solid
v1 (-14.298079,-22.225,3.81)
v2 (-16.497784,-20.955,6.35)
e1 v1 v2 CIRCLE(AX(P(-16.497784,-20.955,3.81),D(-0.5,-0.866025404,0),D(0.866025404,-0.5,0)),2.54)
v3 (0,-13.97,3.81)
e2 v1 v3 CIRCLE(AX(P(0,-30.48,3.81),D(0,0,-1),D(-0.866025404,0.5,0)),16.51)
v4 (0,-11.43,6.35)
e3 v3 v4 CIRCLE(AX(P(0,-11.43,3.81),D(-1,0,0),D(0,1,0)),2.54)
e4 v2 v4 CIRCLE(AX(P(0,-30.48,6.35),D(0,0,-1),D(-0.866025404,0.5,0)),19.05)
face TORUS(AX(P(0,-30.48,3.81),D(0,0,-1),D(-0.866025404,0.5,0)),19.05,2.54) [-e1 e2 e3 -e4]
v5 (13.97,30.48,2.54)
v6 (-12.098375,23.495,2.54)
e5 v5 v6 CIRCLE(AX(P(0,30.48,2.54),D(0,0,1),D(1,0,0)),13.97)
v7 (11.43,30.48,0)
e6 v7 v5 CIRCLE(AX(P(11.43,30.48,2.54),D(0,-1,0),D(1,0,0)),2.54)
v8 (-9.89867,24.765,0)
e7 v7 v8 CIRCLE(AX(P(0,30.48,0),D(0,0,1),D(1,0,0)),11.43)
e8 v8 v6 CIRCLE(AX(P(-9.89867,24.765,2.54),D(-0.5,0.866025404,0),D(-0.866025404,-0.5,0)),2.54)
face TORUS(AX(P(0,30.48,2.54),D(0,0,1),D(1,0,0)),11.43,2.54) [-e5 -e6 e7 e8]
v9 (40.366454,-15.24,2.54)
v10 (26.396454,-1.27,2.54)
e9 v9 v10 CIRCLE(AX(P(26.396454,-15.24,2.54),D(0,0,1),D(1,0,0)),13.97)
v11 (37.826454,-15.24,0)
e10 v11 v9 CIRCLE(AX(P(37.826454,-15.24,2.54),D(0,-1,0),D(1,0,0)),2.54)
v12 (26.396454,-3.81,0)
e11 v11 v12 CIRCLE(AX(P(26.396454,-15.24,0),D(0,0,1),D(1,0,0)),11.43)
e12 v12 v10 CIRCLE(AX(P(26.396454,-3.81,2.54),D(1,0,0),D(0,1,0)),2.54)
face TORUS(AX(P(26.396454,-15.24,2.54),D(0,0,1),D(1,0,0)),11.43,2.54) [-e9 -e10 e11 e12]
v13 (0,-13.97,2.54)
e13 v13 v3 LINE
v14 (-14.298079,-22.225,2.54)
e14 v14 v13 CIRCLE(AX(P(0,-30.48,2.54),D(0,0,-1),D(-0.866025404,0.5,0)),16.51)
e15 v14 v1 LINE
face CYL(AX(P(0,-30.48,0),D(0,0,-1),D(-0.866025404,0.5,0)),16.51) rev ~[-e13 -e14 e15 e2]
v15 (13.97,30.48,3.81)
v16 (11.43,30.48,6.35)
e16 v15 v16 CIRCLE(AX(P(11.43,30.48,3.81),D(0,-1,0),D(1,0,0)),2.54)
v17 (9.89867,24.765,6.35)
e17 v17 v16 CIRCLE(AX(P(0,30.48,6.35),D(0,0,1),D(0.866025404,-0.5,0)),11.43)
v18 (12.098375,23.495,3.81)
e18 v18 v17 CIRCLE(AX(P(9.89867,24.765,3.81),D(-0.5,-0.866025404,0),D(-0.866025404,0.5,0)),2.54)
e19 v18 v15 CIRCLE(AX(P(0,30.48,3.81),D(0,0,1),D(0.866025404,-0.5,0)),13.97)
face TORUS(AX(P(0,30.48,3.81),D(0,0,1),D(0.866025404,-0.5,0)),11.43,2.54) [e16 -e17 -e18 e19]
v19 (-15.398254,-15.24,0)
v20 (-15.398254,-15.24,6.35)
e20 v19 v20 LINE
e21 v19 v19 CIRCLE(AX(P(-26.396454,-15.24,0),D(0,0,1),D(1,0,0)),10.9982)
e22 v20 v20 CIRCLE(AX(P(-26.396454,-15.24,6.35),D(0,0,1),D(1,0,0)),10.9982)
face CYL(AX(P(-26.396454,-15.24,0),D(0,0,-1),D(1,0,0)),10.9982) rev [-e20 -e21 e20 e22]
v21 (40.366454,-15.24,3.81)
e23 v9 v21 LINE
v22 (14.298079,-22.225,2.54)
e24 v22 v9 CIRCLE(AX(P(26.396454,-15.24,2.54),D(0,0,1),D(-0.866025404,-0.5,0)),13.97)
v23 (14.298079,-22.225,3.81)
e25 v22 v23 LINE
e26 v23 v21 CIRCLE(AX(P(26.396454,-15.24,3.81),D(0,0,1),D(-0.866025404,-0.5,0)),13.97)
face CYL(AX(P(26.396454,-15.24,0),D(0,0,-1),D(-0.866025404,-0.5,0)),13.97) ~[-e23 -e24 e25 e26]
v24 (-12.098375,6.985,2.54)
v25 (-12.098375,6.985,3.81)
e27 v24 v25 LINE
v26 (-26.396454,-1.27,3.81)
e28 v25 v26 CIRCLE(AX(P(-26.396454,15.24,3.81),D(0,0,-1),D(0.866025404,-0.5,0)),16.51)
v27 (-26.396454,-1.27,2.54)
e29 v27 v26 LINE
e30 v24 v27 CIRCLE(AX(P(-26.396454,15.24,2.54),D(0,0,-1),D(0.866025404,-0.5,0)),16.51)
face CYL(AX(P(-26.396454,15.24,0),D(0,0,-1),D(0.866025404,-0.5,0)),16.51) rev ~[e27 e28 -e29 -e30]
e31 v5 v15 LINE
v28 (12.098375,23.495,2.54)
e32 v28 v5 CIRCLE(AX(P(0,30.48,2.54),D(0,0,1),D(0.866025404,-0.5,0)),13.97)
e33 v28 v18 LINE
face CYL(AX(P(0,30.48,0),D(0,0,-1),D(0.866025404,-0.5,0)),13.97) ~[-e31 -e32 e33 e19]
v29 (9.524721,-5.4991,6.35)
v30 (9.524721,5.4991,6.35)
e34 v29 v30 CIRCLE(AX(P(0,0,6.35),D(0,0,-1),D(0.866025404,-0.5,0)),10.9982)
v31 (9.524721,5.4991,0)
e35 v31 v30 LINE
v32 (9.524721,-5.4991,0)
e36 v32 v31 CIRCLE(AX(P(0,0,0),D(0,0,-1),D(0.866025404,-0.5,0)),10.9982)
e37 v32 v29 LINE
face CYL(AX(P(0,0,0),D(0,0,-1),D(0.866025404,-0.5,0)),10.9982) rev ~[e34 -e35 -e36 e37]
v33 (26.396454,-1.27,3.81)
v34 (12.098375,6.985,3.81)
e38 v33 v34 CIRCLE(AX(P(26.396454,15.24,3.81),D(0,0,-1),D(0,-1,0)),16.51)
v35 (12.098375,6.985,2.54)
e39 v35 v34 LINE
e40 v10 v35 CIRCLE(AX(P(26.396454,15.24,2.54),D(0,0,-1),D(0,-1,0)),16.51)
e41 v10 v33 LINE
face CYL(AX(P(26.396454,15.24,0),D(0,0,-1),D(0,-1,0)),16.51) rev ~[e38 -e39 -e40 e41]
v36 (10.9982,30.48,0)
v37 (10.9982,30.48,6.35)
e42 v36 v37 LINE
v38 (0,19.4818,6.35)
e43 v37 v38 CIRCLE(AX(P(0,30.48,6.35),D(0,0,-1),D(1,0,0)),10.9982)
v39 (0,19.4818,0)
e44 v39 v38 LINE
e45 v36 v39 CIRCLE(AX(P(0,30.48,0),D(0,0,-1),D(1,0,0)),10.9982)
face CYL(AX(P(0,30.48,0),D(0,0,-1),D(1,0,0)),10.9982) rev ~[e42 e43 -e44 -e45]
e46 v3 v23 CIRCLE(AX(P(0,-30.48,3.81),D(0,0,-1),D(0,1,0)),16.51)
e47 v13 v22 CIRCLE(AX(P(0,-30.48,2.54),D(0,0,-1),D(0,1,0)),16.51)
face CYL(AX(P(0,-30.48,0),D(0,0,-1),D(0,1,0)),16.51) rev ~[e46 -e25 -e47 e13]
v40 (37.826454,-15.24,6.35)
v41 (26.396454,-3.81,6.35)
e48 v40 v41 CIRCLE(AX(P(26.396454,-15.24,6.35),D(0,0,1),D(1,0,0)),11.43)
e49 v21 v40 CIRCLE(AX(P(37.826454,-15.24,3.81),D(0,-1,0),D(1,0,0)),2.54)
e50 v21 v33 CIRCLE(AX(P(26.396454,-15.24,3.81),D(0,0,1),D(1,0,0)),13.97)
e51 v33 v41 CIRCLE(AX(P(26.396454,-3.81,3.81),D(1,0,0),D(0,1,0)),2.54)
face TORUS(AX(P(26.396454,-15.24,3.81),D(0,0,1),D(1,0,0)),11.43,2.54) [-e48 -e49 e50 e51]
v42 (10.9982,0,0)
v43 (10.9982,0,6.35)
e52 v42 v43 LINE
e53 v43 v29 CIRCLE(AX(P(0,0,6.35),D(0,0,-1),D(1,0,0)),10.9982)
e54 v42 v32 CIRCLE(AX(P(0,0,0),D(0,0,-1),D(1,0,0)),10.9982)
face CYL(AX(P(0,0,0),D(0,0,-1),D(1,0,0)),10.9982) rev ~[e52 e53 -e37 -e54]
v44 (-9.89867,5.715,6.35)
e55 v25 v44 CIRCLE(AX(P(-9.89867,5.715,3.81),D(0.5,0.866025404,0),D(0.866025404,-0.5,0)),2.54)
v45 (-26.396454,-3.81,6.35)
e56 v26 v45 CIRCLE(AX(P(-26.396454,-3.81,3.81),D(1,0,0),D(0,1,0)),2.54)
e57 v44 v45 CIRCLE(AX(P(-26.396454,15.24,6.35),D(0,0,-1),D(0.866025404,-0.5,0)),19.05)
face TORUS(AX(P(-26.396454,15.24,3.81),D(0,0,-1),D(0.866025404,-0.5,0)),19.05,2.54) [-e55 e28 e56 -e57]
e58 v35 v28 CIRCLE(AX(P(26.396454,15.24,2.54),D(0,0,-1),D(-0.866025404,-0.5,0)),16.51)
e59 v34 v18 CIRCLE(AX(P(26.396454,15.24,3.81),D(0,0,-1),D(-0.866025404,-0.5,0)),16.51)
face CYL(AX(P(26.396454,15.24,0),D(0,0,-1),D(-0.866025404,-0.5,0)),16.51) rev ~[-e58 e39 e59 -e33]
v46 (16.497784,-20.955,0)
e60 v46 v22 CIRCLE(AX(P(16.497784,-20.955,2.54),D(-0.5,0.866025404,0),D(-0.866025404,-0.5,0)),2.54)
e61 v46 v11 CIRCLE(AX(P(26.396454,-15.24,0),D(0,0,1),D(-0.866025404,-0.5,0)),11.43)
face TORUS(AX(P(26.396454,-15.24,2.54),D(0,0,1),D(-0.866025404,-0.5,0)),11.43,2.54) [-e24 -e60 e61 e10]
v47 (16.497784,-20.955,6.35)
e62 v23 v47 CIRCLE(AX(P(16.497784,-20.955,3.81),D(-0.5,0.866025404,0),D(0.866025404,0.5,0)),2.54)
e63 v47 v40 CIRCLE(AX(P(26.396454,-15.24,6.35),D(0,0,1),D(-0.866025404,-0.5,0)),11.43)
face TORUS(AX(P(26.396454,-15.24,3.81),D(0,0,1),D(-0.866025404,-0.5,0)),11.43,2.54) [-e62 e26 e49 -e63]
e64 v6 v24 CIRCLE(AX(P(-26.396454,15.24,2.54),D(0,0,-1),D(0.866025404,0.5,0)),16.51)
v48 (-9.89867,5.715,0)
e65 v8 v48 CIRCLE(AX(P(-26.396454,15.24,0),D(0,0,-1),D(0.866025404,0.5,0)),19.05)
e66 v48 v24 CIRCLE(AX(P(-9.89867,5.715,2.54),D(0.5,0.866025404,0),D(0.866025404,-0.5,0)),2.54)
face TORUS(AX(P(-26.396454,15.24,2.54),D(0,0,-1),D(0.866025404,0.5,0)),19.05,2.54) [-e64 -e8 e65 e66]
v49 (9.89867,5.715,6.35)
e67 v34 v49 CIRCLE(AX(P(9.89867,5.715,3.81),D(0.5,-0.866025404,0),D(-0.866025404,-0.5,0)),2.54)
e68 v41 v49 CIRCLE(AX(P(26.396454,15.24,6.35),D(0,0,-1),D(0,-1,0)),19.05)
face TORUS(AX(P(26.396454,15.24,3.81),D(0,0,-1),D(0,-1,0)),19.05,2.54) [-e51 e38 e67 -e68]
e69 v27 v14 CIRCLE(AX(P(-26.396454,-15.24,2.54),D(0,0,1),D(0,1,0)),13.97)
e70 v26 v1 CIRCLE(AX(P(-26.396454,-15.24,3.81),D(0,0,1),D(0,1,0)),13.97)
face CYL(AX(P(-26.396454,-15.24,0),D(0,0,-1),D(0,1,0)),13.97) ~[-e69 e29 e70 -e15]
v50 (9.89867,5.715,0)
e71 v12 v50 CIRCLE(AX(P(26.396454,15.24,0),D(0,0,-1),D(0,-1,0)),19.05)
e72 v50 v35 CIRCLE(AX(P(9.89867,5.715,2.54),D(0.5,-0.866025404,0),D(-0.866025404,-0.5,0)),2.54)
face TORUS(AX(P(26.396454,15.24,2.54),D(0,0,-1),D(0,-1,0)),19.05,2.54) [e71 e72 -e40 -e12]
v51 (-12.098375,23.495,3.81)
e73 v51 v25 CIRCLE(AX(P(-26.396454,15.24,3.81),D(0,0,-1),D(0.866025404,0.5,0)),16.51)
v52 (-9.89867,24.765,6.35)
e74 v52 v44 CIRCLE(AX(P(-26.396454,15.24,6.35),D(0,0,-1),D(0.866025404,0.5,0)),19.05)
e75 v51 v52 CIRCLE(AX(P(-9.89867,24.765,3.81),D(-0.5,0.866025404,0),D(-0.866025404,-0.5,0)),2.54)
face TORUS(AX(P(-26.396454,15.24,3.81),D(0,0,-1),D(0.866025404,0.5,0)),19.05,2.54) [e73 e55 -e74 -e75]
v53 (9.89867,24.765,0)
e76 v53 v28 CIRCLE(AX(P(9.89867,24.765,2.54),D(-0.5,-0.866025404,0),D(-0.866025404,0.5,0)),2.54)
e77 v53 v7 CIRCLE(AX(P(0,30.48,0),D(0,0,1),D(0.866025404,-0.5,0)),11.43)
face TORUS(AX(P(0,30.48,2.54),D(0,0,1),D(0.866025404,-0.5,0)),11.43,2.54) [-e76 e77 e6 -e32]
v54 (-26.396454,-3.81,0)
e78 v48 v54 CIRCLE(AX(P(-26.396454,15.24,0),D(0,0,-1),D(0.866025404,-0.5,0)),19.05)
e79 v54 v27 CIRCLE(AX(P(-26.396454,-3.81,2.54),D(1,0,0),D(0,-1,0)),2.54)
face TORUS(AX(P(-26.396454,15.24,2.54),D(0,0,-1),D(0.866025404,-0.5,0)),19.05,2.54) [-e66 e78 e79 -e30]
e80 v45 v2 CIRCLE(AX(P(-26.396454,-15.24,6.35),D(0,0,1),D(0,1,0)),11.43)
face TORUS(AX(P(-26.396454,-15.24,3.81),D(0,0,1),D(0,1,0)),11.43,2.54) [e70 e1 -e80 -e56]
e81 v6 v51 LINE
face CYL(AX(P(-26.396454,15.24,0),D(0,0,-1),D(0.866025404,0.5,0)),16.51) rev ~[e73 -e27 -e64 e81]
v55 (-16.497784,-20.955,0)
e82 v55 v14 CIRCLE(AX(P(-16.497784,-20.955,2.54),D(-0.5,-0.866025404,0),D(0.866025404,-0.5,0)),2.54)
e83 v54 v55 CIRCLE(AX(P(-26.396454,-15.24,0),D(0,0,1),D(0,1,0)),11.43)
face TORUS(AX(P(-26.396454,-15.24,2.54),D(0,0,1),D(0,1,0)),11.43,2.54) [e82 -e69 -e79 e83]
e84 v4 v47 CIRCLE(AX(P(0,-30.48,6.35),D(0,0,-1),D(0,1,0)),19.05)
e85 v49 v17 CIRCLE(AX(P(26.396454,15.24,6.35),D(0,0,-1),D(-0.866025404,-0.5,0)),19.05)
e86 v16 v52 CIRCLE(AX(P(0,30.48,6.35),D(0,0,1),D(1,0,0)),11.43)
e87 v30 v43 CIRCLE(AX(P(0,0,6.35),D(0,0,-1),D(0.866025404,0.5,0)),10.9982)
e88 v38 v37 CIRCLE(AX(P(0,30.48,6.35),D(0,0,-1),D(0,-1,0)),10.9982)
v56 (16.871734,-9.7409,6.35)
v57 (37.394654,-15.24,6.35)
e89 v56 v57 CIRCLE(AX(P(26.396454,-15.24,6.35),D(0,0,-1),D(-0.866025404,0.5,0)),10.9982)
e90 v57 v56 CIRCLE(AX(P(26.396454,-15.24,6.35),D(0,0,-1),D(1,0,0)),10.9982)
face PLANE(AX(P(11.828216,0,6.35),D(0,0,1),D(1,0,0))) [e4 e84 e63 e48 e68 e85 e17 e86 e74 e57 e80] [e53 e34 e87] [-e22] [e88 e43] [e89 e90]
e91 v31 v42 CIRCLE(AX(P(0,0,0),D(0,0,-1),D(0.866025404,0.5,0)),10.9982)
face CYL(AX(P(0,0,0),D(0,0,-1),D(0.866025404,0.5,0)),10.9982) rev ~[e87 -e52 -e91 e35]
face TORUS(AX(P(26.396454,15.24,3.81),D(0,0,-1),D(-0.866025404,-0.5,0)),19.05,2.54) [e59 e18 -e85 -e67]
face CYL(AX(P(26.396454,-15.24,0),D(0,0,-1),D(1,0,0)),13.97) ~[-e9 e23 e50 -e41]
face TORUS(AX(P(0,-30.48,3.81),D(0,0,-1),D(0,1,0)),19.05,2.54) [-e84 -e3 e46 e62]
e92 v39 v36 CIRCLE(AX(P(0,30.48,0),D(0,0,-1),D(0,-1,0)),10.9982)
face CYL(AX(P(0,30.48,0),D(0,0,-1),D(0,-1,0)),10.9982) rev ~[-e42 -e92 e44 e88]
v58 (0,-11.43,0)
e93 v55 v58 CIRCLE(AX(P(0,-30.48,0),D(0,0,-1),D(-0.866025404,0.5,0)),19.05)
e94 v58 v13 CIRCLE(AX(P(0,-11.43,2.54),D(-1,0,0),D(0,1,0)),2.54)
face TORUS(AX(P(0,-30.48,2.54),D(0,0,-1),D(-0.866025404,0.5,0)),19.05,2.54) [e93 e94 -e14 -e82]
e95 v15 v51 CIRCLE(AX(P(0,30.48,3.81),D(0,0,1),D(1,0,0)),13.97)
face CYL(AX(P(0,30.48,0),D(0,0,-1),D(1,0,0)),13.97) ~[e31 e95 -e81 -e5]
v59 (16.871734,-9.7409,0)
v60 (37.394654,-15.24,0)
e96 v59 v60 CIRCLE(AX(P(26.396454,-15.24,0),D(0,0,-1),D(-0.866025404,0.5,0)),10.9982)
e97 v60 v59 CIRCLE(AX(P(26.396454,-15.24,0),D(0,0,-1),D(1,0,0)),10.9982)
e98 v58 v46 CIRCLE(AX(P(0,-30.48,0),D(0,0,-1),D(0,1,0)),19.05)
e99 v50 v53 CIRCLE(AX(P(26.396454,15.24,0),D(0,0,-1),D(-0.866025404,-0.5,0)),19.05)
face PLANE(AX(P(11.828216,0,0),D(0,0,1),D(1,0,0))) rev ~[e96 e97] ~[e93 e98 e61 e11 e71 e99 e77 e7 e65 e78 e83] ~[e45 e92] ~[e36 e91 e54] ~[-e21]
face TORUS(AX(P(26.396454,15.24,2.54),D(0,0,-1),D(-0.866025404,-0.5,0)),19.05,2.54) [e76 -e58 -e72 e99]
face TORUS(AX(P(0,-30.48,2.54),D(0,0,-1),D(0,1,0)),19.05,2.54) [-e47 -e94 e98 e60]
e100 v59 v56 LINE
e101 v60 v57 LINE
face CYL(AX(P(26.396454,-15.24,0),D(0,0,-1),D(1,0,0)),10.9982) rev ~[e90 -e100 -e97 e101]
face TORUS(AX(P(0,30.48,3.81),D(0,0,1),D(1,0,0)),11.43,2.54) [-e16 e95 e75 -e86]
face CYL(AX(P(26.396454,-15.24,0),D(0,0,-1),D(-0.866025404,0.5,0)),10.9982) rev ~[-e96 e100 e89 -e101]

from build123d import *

# Parameters (mm, degrees)
F0_R     = 10.9982
F1_DEPTH = 6.35
F2_R     = 2.54
F3_R     = 2.54


with BuildPart() as f1:
    # F0 (on Top) → F1 (new body)
    with BuildSketch(Plane.XY):
        with BuildLine():
            ThreePointArc((9.5247205959, 5.4991), (10.6234454227, 2.8465436218), (10.9982, 0))
            ThreePointArc((10.9982, 0), (10.6234454227, -2.8465436218), (9.5247205959, -5.4991))
            Line((9.5247205959, -5.4991), (12.0983748909, -6.985))
            ThreePointArc((12.0983748909, -6.985), (13.4939837933, -3.6157020601), (13.97, 0))
            ThreePointArc((13.97, 0), (13.4939837933, 3.6157020601), (12.0983748909, 6.985))
            Line((12.0983748909, 6.985), (9.5247205959, 5.4991))
        make_face()
        with BuildLine():
            ThreePointArc((0, 10.9982), (5.4991, 9.5247205959), (9.5247205959, 5.4991))
            Line((9.5247205959, 5.4991), (12.0983748909, 6.985))
            ThreePointArc((12.0983748909, 6.985), (6.985, 12.0983748909), (0, 13.97))
            Line((0, 13.97), (0, 10.9982))
        make_face()
        with BuildLine():
            Line((12.0983748909, -6.985), (9.5247205959, -5.4991))
            ThreePointArc((9.5247205959, -5.4991), (-9.5247205959, -5.4991), (0, 10.9982))
            Line((0, 10.9982), (0, 13.97))
            ThreePointArc((0, 13.97), (-6.985, 12.0983748909), (-12.0983748909, 6.985))
            ThreePointArc((-12.0983748909, 6.985), (-12.0983748909, -6.985), (0, -13.97))
            ThreePointArc((0, -13.97), (6.985, -12.0983748909), (12.0983748909, -6.985))
        make_face()
        with BuildLine():
            ThreePointArc((26.3964543073, -1.27), (18.1414543073, 0.9419205835), (12.0983748909, 6.985))
            ThreePointArc((12.0983748909, 6.985), (13.4939837933, 3.6157020601), (13.97, 0))
            ThreePointArc((13.97, 0), (13.4939837933, -3.6157020601), (12.0983748909, -6.985))
            Line((12.0983748909, -6.985), (14.2980794165, -8.255))
            ThreePointArc((14.2980794165, -8.255), (19.4114543073, -3.1416251091), (26.3964543073, -1.27))
        make_face()
        with BuildLine():
            ThreePointArc((0, 13.97), (6.985, 12.0983748909), (12.0983748909, 6.985))
            ThreePointArc((12.0983748909, 6.985), (9.8864543073, 15.24), (12.0983748909, 23.495))
            ThreePointArc((12.0983748909, 23.495), (6.985, 18.3816251091), (0, 16.51))
            Line((0, 16.51), (0, 13.97))
        make_face()
        with BuildLine():
            Line((14.2980794165, -8.255), (12.0983748909, -6.985))
            ThreePointArc((12.0983748909, -6.985), (6.985, -12.0983748909), (0, -13.97))
            ThreePointArc((0, -13.97), (8.255, -16.1819205835), (14.2980794165, -22.225))
            ThreePointArc((14.2980794165, -22.225), (12.4264543073, -15.24), (14.2980794165, -8.255))
        make_face()
        with BuildLine():
            ThreePointArc((-12.0983748909, 6.985), (-6.985, 12.0983748909), (0, 13.97))
            Line((0, 13.97), (0, 16.51))
            ThreePointArc((0, 16.51), (-6.985, 18.3816251091), (-12.0983748909, 23.495))
            ThreePointArc((-12.0983748909, 23.495), (-9.8864543073, 15.24), (-12.0983748909, 6.985))
        make_face()
        with BuildLine():
            ThreePointArc((0, 16.51), (6.985, 18.3816251091), (12.0983748909, 23.495))
            ThreePointArc((12.0983748909, 23.495), (13.4939837933, 26.8642979399), (13.97, 30.48))
            ThreePointArc((13.97, 30.48), (-3.6157020601, 43.9739837933), (-12.0983748909, 23.495))
            ThreePointArc((-12.0983748909, 23.495), (-6.985, 18.3816251091), (0, 16.51))
        make_face()
        with BuildLine():
            ThreePointArc((10.9982, 30.48), (7.7769018008, 22.7030981992), (0, 19.4818))
            ThreePointArc((0, 19.4818), (-7.7769018008, 38.2569018008), (10.9982, 30.48))
        make_face(mode=Mode.SUBTRACT)
        with BuildLine():
            ThreePointArc((40.3664543073, -15.24), (36.2747360405, -5.3617182668), (26.3964543073, -1.27))
            ThreePointArc((26.3964543073, -1.27), (19.4114543073, -3.1416251091), (14.2980794165, -8.255))
            ThreePointArc((14.2980794165, -8.255), (12.4264543073, -15.24), (14.2980794165, -22.225))
            ThreePointArc((14.2980794165, -22.225), (30.0121563674, -28.7339837933), (40.3664543073, -15.24))
        make_face()
        with BuildLine():
            ThreePointArc((37.3946543073, -15.24), (23.5499106855, -25.8634454227), (16.8717337114, -9.7409))
            ThreePointArc((16.8717337114, -9.7409), (29.2429979292, -4.6165545773), (37.3946543073, -15.24))
        make_face(mode=Mode.SUBTRACT)
        with BuildLine():
            ThreePointArc((-14.2980794165, -22.225), (-8.255, -16.1819205835), (0, -13.97))
            ThreePointArc((0, -13.97), (-12.0983748909, -6.985), (-12.0983748909, 6.985))
            ThreePointArc((-12.0983748909, 6.985), (-18.1414543073, 0.9419205835), (-26.3964543073, -1.27))
            ThreePointArc((-26.3964543073, -1.27), (-16.5181725742, -5.3617182668), (-12.4264543073, -15.24))
            ThreePointArc((-12.4264543073, -15.24), (-12.9024705141, -18.8557020601), (-14.2980794165, -22.225))
        make_face()
        with BuildLine():
            ThreePointArc((-26.3964543073, -1.27), (-38.4948291982, -22.225), (-14.2980794165, -22.225))
            ThreePointArc((-14.2980794165, -22.225), (-12.9024705141, -18.8557020601), (-12.4264543073, -15.24))
            ThreePointArc((-12.4264543073, -15.24), (-16.5181725742, -5.3617182668), (-26.3964543073, -1.27))
        make_face()
        with Locations((-26.3964543073, -15.24)):
            Circle(F0_R, mode=Mode.SUBTRACT)
    extrude(amount=F1_DEPTH)

    # F2
    f2_edges = [f1.edges().sort_by_distance(p)[0] for p in [
        (-38.494829, -22.225, 6.35),
        (0, -13.97, 6.35),
        (38.494829, -22.225, 6.35),
        (0, 44.45, 6.35),
        (12.098375, 6.985, 6.35),
        (-12.098375, 6.985, 6.35),
    ]]
    fillet(f2_edges, radius=F2_R)

    # F3
    f3_edges = [f1.edges().sort_by_distance(p)[0] for p in [
        (38.494829, -22.225, 0),
        (12.098375, 6.985, 0),
        (0, 44.45, 0),
        (-12.098375, 6.985, 0),
        (-38.494829, -22.225, 0),
        (0, -13.97, 0),
    ]]
    fillet(f3_edges, radius=F3_R)


solid = f1.part
